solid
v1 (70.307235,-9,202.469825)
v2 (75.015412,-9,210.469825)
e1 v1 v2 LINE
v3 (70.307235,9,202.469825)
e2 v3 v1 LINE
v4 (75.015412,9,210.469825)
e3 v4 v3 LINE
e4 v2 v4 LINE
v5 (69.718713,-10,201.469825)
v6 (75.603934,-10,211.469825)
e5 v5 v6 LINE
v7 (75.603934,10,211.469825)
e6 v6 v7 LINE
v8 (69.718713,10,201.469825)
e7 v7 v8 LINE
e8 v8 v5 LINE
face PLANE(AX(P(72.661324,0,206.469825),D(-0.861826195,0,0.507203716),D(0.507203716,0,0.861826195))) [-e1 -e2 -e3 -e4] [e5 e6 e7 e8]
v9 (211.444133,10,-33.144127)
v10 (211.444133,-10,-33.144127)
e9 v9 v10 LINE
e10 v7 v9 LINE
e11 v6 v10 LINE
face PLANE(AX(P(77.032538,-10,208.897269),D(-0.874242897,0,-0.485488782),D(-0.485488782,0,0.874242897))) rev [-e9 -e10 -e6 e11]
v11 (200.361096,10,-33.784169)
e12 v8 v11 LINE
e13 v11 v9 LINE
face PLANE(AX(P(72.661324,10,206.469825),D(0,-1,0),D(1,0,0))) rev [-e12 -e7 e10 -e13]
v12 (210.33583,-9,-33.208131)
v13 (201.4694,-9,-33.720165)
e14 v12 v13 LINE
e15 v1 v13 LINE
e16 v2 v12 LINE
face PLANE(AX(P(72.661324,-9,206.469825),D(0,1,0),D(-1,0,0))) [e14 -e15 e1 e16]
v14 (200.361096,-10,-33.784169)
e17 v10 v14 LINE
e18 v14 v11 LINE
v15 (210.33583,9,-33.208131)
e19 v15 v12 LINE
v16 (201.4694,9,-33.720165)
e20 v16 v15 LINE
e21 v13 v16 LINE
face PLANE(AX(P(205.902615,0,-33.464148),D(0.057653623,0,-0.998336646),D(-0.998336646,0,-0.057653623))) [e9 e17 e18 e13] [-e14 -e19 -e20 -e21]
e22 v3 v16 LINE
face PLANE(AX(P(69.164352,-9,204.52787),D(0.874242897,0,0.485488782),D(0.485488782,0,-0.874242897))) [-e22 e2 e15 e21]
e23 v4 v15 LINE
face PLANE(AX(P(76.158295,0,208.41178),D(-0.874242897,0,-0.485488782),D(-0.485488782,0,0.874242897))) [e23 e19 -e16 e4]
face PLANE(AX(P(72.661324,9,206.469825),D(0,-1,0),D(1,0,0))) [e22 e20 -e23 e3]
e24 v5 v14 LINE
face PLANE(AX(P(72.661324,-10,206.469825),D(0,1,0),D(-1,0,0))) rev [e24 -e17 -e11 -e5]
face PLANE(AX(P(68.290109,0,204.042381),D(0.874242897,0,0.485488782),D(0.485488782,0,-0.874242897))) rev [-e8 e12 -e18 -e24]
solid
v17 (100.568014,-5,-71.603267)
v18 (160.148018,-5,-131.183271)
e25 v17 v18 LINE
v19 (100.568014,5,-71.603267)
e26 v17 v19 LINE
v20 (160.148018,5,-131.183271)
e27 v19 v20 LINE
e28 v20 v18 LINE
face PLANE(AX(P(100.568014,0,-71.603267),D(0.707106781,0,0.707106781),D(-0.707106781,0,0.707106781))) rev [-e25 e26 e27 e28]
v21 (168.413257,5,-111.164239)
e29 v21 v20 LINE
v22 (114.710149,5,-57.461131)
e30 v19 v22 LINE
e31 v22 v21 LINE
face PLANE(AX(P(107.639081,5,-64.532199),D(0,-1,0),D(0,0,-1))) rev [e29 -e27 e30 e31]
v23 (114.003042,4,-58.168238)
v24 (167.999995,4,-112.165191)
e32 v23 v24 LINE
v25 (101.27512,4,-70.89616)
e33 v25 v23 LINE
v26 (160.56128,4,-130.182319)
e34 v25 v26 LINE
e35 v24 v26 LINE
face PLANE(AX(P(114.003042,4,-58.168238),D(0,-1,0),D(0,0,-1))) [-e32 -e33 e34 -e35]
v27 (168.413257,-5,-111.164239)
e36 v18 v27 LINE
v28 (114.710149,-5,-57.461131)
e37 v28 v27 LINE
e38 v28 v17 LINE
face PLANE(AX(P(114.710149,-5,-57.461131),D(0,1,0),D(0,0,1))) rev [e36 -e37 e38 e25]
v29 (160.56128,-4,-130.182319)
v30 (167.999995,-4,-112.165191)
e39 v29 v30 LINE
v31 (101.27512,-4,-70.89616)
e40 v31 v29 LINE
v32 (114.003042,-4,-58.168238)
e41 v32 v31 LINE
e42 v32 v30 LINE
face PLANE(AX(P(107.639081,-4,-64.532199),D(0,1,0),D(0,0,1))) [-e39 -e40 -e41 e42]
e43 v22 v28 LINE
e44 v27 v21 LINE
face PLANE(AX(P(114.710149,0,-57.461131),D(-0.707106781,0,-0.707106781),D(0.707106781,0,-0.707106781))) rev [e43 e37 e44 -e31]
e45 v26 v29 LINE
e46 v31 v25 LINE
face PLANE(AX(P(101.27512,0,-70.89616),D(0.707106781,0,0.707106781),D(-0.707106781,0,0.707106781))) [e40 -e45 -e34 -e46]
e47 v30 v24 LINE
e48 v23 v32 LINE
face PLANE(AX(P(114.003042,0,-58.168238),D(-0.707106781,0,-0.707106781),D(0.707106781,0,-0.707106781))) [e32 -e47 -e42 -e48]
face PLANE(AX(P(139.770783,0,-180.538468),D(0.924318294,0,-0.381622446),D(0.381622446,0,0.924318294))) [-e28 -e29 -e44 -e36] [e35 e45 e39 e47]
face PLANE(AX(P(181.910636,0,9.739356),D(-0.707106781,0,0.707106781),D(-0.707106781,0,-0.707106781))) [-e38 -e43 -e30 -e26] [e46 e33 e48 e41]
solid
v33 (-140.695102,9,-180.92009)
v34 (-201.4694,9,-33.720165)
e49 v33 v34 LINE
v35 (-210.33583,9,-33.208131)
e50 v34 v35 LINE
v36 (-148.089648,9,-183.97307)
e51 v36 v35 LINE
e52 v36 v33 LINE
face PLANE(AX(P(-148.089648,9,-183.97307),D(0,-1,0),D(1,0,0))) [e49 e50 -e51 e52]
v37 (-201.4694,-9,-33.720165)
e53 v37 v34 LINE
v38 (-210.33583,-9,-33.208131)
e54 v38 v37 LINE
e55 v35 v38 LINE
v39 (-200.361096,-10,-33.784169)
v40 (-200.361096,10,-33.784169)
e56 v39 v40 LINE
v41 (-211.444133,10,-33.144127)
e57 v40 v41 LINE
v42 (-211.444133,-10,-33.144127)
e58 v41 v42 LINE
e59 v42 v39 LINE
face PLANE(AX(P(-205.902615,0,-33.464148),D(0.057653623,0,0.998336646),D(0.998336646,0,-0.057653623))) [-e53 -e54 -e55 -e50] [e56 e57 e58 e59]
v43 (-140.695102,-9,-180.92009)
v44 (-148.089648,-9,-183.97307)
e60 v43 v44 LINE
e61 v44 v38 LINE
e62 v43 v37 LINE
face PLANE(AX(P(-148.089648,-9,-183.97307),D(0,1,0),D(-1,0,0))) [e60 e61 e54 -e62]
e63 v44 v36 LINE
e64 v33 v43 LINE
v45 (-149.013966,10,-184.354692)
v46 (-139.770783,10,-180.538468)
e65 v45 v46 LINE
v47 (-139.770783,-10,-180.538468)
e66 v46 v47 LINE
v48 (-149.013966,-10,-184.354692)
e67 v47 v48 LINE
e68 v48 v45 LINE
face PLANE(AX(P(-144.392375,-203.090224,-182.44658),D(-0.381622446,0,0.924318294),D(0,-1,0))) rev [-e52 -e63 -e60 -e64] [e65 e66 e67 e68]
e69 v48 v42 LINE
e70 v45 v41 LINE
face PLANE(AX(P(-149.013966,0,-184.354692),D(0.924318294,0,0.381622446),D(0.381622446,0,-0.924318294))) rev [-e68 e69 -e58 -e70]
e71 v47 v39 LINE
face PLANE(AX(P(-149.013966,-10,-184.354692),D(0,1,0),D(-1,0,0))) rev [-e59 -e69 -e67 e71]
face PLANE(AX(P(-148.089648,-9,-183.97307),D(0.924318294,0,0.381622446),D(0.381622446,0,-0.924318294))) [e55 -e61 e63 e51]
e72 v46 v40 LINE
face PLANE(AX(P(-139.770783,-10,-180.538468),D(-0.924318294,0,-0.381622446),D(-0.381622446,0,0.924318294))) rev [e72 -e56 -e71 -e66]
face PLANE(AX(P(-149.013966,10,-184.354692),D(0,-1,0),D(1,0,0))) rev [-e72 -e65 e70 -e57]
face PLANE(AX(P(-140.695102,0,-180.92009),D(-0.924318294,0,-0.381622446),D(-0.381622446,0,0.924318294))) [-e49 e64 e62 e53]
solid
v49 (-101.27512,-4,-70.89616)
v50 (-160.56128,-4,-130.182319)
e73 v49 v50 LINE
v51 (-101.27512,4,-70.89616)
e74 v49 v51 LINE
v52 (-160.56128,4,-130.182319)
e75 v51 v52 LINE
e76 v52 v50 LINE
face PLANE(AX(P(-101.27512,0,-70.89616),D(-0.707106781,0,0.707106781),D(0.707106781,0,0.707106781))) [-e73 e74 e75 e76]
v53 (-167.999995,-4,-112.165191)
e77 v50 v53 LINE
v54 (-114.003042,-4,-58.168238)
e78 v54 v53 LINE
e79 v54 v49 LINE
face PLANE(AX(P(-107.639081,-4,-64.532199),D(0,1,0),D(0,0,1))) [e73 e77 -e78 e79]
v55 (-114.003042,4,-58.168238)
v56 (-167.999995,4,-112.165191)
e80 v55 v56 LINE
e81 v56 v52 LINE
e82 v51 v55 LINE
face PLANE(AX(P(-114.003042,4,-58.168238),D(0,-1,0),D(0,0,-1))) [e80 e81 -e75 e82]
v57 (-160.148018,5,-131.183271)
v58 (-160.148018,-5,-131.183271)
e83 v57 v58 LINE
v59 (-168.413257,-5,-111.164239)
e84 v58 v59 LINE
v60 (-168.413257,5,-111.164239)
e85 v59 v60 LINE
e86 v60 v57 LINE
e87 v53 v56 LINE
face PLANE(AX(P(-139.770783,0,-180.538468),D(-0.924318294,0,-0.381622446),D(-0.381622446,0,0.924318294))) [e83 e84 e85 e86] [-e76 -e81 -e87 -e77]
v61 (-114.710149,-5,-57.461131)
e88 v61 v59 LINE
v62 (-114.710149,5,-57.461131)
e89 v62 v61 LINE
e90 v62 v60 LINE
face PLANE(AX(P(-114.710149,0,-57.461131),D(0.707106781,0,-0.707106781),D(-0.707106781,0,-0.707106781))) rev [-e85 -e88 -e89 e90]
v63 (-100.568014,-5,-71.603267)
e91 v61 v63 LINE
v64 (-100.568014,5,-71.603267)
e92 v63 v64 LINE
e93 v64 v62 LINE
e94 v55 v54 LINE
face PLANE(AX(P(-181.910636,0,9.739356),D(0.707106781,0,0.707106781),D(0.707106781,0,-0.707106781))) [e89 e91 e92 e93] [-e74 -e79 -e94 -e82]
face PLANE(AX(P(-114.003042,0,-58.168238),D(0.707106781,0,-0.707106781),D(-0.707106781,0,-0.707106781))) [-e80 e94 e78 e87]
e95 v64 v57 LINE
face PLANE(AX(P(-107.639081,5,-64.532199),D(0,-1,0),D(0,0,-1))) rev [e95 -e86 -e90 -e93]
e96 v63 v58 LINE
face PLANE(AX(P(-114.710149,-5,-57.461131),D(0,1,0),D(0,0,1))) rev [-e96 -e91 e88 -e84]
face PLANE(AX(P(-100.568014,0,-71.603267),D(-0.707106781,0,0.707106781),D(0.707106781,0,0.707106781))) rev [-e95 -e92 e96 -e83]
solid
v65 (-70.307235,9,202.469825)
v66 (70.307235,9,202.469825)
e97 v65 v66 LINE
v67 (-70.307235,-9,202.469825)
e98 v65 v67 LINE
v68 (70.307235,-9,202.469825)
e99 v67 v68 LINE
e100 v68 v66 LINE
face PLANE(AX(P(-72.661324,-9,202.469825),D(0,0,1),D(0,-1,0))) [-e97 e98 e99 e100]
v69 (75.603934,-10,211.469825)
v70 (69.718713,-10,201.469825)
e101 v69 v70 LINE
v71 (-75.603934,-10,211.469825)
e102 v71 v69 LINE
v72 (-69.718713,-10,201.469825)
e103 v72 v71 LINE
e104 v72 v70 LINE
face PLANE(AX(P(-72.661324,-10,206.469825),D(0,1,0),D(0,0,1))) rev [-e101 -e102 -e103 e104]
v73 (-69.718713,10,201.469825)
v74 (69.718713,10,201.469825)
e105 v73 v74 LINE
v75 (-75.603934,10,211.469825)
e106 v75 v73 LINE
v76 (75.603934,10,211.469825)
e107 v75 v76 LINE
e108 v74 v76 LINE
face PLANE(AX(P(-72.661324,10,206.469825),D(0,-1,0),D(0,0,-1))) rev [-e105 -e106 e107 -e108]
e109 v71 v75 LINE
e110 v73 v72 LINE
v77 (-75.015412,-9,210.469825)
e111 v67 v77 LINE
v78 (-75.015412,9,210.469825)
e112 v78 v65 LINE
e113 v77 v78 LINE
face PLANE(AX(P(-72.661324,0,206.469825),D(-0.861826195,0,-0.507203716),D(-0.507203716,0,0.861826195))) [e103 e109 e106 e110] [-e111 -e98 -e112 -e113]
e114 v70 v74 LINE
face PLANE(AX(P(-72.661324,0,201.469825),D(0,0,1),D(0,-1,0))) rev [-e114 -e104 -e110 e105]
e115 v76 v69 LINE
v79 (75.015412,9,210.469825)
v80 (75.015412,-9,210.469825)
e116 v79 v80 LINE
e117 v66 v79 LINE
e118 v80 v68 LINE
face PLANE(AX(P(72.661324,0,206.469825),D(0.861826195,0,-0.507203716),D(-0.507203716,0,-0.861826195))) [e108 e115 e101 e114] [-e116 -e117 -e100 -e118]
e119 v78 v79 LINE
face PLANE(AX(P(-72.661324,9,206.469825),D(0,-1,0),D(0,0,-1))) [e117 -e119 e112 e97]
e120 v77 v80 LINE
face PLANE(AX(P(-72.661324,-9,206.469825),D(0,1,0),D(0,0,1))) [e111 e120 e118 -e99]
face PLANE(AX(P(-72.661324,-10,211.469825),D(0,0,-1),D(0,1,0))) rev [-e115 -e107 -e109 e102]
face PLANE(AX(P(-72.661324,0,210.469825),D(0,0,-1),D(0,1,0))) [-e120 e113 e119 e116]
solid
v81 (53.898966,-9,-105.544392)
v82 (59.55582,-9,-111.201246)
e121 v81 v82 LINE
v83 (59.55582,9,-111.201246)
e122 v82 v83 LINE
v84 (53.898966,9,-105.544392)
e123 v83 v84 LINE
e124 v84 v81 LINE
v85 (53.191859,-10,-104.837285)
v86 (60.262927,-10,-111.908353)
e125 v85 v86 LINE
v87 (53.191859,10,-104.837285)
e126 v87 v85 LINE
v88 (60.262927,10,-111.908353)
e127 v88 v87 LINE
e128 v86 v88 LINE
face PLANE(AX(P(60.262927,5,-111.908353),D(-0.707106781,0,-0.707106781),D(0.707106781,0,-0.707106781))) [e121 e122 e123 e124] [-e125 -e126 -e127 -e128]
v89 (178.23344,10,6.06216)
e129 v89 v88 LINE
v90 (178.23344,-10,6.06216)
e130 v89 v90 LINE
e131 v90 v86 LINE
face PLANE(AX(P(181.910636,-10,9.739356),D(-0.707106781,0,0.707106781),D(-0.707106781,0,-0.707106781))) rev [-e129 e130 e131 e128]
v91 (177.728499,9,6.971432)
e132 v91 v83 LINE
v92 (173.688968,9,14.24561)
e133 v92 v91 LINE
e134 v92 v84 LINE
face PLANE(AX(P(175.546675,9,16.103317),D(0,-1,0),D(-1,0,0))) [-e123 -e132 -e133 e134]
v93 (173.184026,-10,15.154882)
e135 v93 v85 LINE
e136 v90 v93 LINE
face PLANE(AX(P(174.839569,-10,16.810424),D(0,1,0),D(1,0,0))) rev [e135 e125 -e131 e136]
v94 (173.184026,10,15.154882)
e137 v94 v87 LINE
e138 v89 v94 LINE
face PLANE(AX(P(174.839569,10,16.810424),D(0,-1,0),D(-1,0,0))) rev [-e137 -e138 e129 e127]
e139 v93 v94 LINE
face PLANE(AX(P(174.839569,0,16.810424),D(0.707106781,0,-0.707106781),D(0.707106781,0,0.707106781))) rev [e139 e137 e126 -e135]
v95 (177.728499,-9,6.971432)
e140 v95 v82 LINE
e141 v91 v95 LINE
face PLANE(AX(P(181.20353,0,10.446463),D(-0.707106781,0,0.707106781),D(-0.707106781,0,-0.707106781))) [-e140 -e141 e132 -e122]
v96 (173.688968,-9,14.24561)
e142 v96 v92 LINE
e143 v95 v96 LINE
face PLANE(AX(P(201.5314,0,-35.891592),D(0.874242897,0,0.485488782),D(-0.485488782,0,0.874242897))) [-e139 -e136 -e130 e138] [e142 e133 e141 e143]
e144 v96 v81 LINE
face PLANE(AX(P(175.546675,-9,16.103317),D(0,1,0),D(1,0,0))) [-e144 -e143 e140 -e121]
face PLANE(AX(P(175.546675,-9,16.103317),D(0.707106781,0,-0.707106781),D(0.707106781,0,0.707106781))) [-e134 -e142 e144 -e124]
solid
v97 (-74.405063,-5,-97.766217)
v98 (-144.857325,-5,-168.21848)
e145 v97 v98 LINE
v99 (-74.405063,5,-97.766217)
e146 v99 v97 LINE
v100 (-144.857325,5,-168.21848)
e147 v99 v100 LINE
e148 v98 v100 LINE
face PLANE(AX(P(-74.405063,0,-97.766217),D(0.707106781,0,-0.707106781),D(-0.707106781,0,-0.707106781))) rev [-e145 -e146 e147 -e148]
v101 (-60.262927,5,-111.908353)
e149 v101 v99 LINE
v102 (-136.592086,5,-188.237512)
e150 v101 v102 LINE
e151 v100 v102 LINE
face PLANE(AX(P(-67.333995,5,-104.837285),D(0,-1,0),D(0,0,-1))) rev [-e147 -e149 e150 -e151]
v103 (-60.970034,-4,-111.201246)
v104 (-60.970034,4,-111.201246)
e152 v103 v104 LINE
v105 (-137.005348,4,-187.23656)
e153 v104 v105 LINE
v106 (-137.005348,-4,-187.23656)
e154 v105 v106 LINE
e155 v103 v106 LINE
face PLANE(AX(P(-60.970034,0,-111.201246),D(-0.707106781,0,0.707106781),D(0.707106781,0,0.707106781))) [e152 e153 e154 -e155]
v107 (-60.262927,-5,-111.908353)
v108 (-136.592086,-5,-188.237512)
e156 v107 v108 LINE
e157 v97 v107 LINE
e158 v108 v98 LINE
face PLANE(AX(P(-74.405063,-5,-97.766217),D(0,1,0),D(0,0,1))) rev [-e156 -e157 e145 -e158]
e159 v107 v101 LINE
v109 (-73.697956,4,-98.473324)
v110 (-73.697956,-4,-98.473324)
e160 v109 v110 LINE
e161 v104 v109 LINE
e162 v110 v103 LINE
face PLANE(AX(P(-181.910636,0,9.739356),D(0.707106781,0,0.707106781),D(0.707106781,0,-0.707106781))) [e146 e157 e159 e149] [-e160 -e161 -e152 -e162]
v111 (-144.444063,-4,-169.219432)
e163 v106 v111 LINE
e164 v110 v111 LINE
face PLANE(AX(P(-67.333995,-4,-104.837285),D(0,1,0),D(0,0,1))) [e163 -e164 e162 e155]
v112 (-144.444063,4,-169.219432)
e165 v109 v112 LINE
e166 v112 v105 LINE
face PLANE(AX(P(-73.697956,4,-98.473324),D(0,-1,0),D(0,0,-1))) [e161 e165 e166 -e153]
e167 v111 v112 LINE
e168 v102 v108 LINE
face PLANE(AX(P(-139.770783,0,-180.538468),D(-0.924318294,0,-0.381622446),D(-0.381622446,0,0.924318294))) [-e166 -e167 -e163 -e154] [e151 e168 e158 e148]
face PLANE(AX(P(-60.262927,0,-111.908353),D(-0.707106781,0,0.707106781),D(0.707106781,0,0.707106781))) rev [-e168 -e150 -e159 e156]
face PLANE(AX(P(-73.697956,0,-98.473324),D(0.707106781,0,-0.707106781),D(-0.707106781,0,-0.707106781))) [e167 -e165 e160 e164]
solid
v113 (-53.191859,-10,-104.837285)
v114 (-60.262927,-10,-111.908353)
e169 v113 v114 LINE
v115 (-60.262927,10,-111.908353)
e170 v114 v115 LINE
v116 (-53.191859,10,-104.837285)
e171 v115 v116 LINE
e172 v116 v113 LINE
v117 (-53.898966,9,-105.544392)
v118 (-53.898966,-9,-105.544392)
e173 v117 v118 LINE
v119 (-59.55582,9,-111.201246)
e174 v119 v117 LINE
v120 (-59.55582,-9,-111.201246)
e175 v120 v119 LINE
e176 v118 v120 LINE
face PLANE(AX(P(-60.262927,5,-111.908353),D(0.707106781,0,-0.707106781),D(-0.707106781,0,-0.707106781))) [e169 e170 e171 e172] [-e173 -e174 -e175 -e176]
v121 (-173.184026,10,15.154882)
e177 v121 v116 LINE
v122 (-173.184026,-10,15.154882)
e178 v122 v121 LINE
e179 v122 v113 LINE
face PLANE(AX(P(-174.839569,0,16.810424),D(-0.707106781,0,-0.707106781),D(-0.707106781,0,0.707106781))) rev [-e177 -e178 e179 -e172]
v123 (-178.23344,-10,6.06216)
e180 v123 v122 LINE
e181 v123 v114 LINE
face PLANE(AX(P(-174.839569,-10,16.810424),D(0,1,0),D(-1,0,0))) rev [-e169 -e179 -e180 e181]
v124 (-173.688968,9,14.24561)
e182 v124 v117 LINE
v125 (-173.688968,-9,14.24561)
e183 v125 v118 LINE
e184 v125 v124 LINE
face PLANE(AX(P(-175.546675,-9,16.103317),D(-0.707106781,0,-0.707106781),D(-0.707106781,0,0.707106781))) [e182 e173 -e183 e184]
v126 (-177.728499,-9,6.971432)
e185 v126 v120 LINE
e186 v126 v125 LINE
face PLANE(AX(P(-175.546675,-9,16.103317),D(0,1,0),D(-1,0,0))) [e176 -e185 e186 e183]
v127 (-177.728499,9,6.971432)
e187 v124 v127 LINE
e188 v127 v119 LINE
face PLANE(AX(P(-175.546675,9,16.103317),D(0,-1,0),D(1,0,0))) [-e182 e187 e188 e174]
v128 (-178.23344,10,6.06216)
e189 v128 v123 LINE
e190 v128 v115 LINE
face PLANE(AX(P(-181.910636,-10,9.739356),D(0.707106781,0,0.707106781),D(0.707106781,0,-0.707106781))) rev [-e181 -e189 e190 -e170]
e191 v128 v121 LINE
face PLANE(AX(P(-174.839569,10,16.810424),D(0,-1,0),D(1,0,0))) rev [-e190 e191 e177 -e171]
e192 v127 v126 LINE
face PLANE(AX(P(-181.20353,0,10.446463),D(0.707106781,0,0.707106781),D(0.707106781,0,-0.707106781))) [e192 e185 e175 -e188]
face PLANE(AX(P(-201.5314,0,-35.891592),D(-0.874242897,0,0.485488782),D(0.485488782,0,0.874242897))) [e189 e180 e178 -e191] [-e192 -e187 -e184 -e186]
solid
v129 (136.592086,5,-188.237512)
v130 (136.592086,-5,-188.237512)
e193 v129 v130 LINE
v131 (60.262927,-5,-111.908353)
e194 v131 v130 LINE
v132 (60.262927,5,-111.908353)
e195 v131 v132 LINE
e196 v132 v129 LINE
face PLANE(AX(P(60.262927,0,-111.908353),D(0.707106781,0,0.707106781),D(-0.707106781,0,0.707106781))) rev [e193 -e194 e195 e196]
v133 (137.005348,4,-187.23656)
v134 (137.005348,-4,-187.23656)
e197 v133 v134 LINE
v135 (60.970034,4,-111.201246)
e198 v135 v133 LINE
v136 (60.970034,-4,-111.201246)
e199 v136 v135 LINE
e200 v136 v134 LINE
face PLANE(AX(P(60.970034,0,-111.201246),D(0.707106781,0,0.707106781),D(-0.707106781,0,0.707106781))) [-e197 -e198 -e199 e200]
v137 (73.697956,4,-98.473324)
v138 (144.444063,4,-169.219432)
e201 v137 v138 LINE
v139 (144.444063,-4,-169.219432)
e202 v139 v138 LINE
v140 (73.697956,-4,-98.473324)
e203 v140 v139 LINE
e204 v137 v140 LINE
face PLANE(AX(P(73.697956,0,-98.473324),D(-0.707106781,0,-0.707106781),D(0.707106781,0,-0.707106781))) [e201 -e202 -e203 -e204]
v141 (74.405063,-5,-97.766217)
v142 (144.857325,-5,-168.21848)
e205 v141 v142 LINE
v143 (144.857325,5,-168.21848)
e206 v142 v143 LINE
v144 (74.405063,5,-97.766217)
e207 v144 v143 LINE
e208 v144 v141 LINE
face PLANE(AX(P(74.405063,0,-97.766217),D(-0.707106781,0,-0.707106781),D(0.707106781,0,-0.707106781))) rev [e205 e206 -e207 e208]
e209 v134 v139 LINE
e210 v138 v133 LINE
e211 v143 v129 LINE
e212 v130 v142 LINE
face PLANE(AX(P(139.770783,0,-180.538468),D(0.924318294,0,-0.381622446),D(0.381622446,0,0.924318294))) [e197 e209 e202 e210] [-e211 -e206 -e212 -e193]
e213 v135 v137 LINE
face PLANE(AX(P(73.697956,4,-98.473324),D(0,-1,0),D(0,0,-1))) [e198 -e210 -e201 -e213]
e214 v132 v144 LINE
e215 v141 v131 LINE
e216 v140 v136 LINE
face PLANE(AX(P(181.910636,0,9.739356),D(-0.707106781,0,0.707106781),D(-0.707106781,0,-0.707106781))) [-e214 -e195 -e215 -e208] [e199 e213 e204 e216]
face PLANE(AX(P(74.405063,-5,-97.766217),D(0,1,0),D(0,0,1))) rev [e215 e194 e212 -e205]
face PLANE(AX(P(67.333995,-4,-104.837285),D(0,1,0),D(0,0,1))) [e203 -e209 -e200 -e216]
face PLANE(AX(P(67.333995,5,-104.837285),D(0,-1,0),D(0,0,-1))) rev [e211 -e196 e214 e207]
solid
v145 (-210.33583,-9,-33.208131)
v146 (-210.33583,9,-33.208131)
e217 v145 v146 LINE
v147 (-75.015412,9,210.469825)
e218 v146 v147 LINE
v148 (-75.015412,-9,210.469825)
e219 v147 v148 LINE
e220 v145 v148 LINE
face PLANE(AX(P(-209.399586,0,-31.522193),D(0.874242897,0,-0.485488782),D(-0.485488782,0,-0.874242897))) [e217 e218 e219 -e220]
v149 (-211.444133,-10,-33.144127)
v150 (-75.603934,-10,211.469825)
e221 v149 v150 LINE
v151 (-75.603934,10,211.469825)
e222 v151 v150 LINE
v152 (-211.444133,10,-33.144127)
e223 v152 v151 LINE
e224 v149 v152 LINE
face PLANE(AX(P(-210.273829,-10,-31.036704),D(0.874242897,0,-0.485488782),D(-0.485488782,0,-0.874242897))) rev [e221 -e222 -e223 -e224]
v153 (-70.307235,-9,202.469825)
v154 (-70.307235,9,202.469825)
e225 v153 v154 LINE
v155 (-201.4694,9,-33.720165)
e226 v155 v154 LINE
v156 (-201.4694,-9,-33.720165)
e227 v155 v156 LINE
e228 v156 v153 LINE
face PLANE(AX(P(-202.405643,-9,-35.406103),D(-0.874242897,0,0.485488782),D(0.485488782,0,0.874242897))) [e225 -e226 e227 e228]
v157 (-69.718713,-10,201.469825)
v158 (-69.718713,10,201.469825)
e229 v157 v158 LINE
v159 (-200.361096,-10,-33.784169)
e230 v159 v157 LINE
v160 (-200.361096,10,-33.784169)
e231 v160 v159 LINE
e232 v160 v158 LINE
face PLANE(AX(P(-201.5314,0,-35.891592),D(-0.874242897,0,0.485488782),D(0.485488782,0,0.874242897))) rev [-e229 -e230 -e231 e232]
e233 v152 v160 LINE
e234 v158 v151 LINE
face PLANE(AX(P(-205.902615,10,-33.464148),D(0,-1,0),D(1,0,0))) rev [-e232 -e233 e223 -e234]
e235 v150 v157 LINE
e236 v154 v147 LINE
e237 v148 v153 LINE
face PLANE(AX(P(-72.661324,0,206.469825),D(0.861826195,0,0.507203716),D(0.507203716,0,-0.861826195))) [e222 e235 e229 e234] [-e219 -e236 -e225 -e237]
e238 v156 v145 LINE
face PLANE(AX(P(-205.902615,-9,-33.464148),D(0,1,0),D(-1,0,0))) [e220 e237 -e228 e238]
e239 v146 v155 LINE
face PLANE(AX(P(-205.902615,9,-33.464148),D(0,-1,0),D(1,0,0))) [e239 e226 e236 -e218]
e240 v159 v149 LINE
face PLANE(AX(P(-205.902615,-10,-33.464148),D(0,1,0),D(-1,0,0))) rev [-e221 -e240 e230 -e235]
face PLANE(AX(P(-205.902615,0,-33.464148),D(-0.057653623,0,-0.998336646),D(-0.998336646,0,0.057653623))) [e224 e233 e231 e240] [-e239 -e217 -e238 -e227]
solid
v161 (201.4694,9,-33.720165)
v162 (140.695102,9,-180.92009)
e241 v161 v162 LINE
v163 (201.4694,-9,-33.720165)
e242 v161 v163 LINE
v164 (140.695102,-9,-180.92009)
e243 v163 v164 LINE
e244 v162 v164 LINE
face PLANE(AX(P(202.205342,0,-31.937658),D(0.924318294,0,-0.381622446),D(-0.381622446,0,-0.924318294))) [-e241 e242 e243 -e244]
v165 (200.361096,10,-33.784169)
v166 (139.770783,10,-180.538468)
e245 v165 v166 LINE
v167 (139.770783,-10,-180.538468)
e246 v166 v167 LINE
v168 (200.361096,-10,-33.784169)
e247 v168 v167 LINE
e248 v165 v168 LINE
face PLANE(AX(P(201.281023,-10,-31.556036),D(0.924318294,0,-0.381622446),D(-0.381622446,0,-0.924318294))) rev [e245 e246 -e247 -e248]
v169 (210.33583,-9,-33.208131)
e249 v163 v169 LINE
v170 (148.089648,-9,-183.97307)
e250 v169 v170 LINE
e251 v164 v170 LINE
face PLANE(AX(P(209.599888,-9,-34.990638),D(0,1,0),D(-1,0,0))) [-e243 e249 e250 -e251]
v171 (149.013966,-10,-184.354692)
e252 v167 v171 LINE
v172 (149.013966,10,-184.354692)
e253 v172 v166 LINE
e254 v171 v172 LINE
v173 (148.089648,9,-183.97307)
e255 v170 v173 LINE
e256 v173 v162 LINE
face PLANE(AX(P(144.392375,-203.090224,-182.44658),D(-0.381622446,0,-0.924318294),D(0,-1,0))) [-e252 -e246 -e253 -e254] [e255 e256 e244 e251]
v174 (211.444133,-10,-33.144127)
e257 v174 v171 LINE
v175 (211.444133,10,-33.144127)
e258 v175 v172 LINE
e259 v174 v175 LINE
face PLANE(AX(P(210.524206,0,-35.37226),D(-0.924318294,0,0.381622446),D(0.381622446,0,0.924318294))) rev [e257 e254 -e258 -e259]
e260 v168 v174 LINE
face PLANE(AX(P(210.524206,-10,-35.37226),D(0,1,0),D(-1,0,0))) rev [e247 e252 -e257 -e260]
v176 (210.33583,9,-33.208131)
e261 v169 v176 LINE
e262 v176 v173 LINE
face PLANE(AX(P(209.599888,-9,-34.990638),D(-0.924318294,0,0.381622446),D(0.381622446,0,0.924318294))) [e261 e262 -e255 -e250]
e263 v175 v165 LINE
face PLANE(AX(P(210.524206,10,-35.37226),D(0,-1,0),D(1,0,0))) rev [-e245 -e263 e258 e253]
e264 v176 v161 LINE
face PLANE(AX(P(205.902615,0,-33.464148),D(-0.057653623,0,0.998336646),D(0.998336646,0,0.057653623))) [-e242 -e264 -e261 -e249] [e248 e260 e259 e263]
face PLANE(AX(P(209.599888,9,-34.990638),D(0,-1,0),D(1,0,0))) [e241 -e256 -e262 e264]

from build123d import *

# Parameters (mm, degrees)
MEMBER_START      = -10
MEMBER_1_DEPTH    = 20
MEMBER_1_2_DEPTH  = 1
MEMBER_START_2    = 9
MEMBER_1_3_DEPTH  = 1
MEMBER_1_4_DEPTH  = 20
MEMBER_1_5_DEPTH  = 1
MEMBER_1_6_DEPTH  = 1
MEMBER_1_7_DEPTH  = 20
MEMBER_1_8_DEPTH  = 1
MEMBER_1_9_DEPTH  = 1
MEMBER_1_10_DEPTH = 20
MEMBER_1_11_DEPTH = 1
MEMBER_1_12_DEPTH = 1
MEMBER_1_13_DEPTH = 20
MEMBER_1_14_DEPTH = 1
MEMBER_1_15_DEPTH = 1
MEMBER_1_16_DEPTH = 20
MEMBER_1_17_DEPTH = 1
MEMBER_1_18_DEPTH = 1
MEMBER_START_3    = -5
MEMBER_1_19_DEPTH = 1
MEMBER_START_4    = 4
MEMBER_1_20_DEPTH = 1
MEMBER_START_5    = -4
MEMBER_1_21_DEPTH = 8
MEMBER_1_22_DEPTH = 1
MEMBER_1_23_DEPTH = 1
MEMBER_1_24_DEPTH = 8


# Read off the part's stored shape, not the designer's step: 结构构件1
with BuildPart() as part:
    # Member 1 outline → Member 1 (new body)
    with BuildSketch(Plane(origin=(0, 0, 0), x_dir=(1, 0, 0), z_dir=(0, 1, 0)).offset(MEMBER_START)):
        Polygon((211.444133454, 33.144126958), (149.013966185, 184.354692044), (148.089647891, 183.973069598), (210.3358297, 33.208131146), align=None)
        Polygon((201.469399669, 33.720164656), (140.695101539, 180.92009003), (139.770783245, 180.538467584), (200.361095915, 33.784168845), align=None)
    extrude(amount=MEMBER_1_DEPTH)

    # Member 1 2 outline → Member 1 2 (add)
    with BuildSketch(Plane(origin=(0, 0, 0), x_dir=(1, 0, 0), z_dir=(0, 1, 0)).offset(MEMBER_START)):
        Polygon((210.3358297, 33.208131146), (148.089647891, 183.973069598), (140.695101539, 180.92009003), (201.469399669, 33.720164656), align=None)
    extrude(amount=MEMBER_1_2_DEPTH)

    # Member 1 3 outline → Member 1 3 (add)
    with BuildSketch(Plane(origin=(0, 0, 0), x_dir=(1, 0, 0), z_dir=(0, 1, 0)).offset(MEMBER_START_2)):
        Polygon((210.3358297, 33.208131146), (148.089647891, 183.973069598), (140.695101539, 180.92009003), (201.469399669, 33.720164656), align=None)
    extrude(amount=MEMBER_1_3_DEPTH)


with BuildPart() as body_2:
    # Member 1 4 outline → Member 1 4 (new body)
    with BuildSketch(Plane(origin=(0, 0, 0), x_dir=(1, 0, 0), z_dir=(0, 1, 0)).offset(MEMBER_START)):
        Polygon((200.361095915, 33.784168845), (69.718713444, -201.469825071), (70.30723549, -202.469825071), (201.469399669, 33.720164656), align=None)
        Polygon((210.3358297, 33.208131146), (75.015411857, -210.469825071), (75.603933902, -211.469825071), (211.444133454, 33.144126958), align=None)
    extrude(amount=MEMBER_1_4_DEPTH)

    # Member 1 5 outline → Member 1 5 (add)
    with BuildSketch(Plane(origin=(0, 0, 0), x_dir=(1, 0, 0), z_dir=(0, 1, 0)).offset(MEMBER_START)):
        Polygon((201.469399669, 33.720164656), (70.30723549, -202.469825071), (75.015411856, -210.469825071), (210.3358297, 33.208131146), align=None)
    extrude(amount=MEMBER_1_5_DEPTH)

    # Member 1 6 outline → Member 1 6 (add)
    with BuildSketch(Plane(origin=(0, 0, 0), x_dir=(1, 0, 0), z_dir=(0, 1, 0)).offset(MEMBER_START_2)):
        Polygon((201.469399669, 33.720164656), (70.30723549, -202.469825071), (75.015411856, -210.469825071), (210.3358297, 33.208131146), align=None)
    extrude(amount=MEMBER_1_6_DEPTH)


with BuildPart() as body_3:
    # Member 1 7 outline → Member 1 7 (new body)
    with BuildSketch(Plane(origin=(0, 0, 0), x_dir=(1, 0, 0), z_dir=(0, 1, 0)).offset(MEMBER_START)):
        Polygon((69.718713444, -201.469825071), (-69.718713444, -201.469825071), (-70.30723549, -202.469825071), (70.30723549, -202.469825071), align=None)
        Polygon((75.015411857, -210.469825071), (-75.015411857, -210.469825071), (-75.603933902, -211.469825071), (75.603933902, -211.469825071), align=None)
    extrude(amount=MEMBER_1_7_DEPTH)

    # Member 1 8 outline → Member 1 8 (add)
    with BuildSketch(Plane(origin=(0, 0, 0), x_dir=(1, 0, 0), z_dir=(0, 1, 0)).offset(MEMBER_START)):
        Polygon((70.30723549, -202.469825071), (-70.30723549, -202.469825071), (-75.015411856, -210.469825071), (75.015411857, -210.469825071), align=None)
    extrude(amount=MEMBER_1_8_DEPTH)

    # Member 1 9 outline → Member 1 9 (add)
    with BuildSketch(Plane(origin=(0, 0, 0), x_dir=(1, 0, 0), z_dir=(0, 1, 0)).offset(MEMBER_START_2)):
        Polygon((70.30723549, -202.469825071), (-70.30723549, -202.469825071), (-75.015411856, -210.469825071), (75.015411857, -210.469825071), align=None)
    extrude(amount=MEMBER_1_9_DEPTH)


with BuildPart() as body_4:
    # Member 1 10 outline → Member 1 10 (new body)
    with BuildSketch(Plane(origin=(0, 0, 0), x_dir=(1, 0, 0), z_dir=(0, 1, 0)).offset(MEMBER_START)):
        Polygon((-69.718713444, -201.469825071), (-200.361095915, 33.784168845), (-201.469399669, 33.720164656), (-70.30723549, -202.469825071), align=None)
        Polygon((-75.015411857, -210.469825071), (-210.3358297, 33.208131146), (-211.444133454, 33.144126958), (-75.603933902, -211.469825071), align=None)
    extrude(amount=MEMBER_1_10_DEPTH)

    # Member 1 11 outline → Member 1 11 (add)
    with BuildSketch(Plane(origin=(0, 0, 0), x_dir=(1, 0, 0), z_dir=(0, 1, 0)).offset(MEMBER_START)):
        Polygon((-70.30723549, -202.469825071), (-201.469399669, 33.720164656), (-210.3358297, 33.208131147), (-75.015411857, -210.469825071), align=None)
    extrude(amount=MEMBER_1_11_DEPTH)

    # Member 1 12 outline → Member 1 12 (add)
    with BuildSketch(Plane(origin=(0, 0, 0), x_dir=(1, 0, 0), z_dir=(0, 1, 0)).offset(MEMBER_START_2)):
        Polygon((-70.30723549, -202.469825071), (-201.469399669, 33.720164656), (-210.3358297, 33.208131147), (-75.015411857, -210.469825071), align=None)
    extrude(amount=MEMBER_1_12_DEPTH)


with BuildPart() as body_5:
    # Member 1 13 outline → Member 1 13 (new body)
    with BuildSketch(Plane(origin=(0, 0, 0), x_dir=(1, 0, 0), z_dir=(0, 1, 0)).offset(MEMBER_START)):
        Polygon((-149.013966185, 184.354692044), (-211.444133454, 33.144126958), (-210.3358297, 33.208131147), (-148.089647891, 183.973069598), align=None)
        Polygon((-140.695101539, 180.92009003), (-201.469399669, 33.720164656), (-200.361095915, 33.784168845), (-139.770783245, 180.538467584), align=None)
    extrude(amount=MEMBER_1_13_DEPTH)

    # Member 1 14 outline → Member 1 14 (add)
    with BuildSketch(Plane(origin=(0, 0, 0), x_dir=(1, 0, 0), z_dir=(0, 1, 0)).offset(MEMBER_START)):
        Polygon((-148.089647891, 183.973069598), (-210.3358297, 33.208131146), (-201.469399669, 33.720164656), (-140.695101539, 180.92009003), align=None)
    extrude(amount=MEMBER_1_14_DEPTH)

    # Member 1 15 outline → Member 1 15 (add)
    with BuildSketch(Plane(origin=(0, 0, 0), x_dir=(1, 0, 0), z_dir=(0, 1, 0)).offset(MEMBER_START_2)):
        Polygon((-148.089647891, 183.973069598), (-210.3358297, 33.208131146), (-201.469399669, 33.720164656), (-140.695101539, 180.92009003), align=None)
    extrude(amount=MEMBER_1_15_DEPTH)


with BuildPart() as body_6:
    # Member 1 16 outline → Member 1 16 (new body)
    with BuildSketch(Plane(origin=(0, 0, 0), x_dir=(1, 0, 0), z_dir=(0, 1, 0)).offset(MEMBER_START)):
        Polygon((-173.184026314, -15.154881759), (-53.191859315, 104.83728524), (-53.898966096, 105.544392022), (-173.688967715, -14.245609598), align=None)
        Polygon((-177.728498928, -6.971432311), (-59.555820345, 111.201246271), (-60.262927127, 111.908353052), (-178.233440329, -6.06216015), align=None)
    extrude(amount=MEMBER_1_16_DEPTH)

    # Member 1 17 outline → Member 1 17 (add)
    with BuildSketch(Plane(origin=(0, 0, 0), x_dir=(1, 0, 0), z_dir=(0, 1, 0)).offset(MEMBER_START)):
        Polygon((-173.688967715, -14.245609598), (-53.898966096, 105.544392022), (-59.555820346, 111.20124627), (-177.728498928, -6.971432311), align=None)
    extrude(amount=MEMBER_1_17_DEPTH)

    # Member 1 18 outline → Member 1 18 (add)
    with BuildSketch(Plane(origin=(0, 0, 0), x_dir=(1, 0, 0), z_dir=(0, 1, 0)).offset(MEMBER_START_2)):
        Polygon((-173.688967715, -14.245609598), (-53.898966096, 105.544392022), (-59.555820346, 111.20124627), (-177.728498928, -6.971432311), align=None)
    extrude(amount=MEMBER_1_18_DEPTH)


with BuildPart() as body_7:
    # Member 1 19 outline → Member 1 19 (new body)
    with BuildSketch(Plane(origin=(0, 0, 0), x_dir=(1, 0, 0), z_dir=(0, 1, 0)).offset(MEMBER_START_3)):
        Polygon((-74.40506275, 97.766217429), (-60.262927127, 111.908353052), (-136.592085909, 188.237511835), (-144.857325246, 168.218479924), align=None)
    extrude(amount=MEMBER_1_19_DEPTH)

    # Member 1 20 outline → Member 1 20 (add)
    with BuildSketch(Plane(origin=(0, 0, 0), x_dir=(1, 0, 0), z_dir=(0, 1, 0)).offset(MEMBER_START_4)):
        Polygon((-74.40506275, 97.766217429), (-60.262927127, 111.908353052), (-136.592085909, 188.237511835), (-144.857325246, 168.218479924), align=None)
    extrude(amount=MEMBER_1_20_DEPTH)

    # Member 1 21 outline → Member 1 21 (add)
    with BuildSketch(Plane(origin=(0, 0, 0), x_dir=(1, 0, 0), z_dir=(0, 1, 0)).offset(MEMBER_START_5)):
        Polygon((-74.40506275, 97.766217429), (-73.697955969, 98.47332421), (-144.444063279, 169.21943152), (-144.857325246, 168.218479924), align=None)
        Polygon((-137.005347876, 187.236560239), (-60.970033908, 111.201246271), (-60.262927127, 111.908353052), (-136.592085909, 188.237511835), align=None)
    extrude(amount=MEMBER_1_21_DEPTH)


with BuildPart() as body_8:
    # Member 1 22 outline → Member 1 22 (new body)
    with BuildSketch(Plane(origin=(0, 0, 0), x_dir=(1, 0, 0), z_dir=(0, 1, 0)).offset(MEMBER_START_3)):
        Polygon((-114.710149278, 57.461130901), (-100.568013654, 71.603266525), (-160.148018019, 131.18327089), (-168.413257356, 111.164238979), align=None)
    extrude(amount=MEMBER_1_22_DEPTH)

    # Member 1 23 outline → Member 1 23 (add)
    with BuildSketch(Plane(origin=(0, 0, 0), x_dir=(1, 0, 0), z_dir=(0, 1, 0)).offset(MEMBER_START_4)):
        Polygon((-114.710149278, 57.461130901), (-100.568013654, 71.603266525), (-160.148018019, 131.18327089), (-168.413257356, 111.164238979), align=None)
    extrude(amount=MEMBER_1_23_DEPTH)

    # Member 1 24 outline → Member 1 24 (add)
    with BuildSketch(Plane(origin=(0, 0, 0), x_dir=(1, 0, 0), z_dir=(0, 1, 0)).offset(MEMBER_START_5)):
        Polygon((-114.710149278, 57.461130901), (-114.003042497, 58.168237682), (-167.99999539, 112.165190575), (-168.413257356, 111.164238979), align=None)
        Polygon((-160.561279986, 130.182319294), (-101.275120435, 70.896159743), (-100.568013654, 71.603266525), (-160.148018019, 131.18327089), align=None)
    extrude(amount=MEMBER_1_24_DEPTH)


with BuildPart() as body_9:
    # 镜向1: mirrored copy
    add(body_7.part.mirror(Plane(origin=(0, 0, 0), x_dir=(0, 0, 1), z_dir=(1, 0, 0))))


with BuildPart() as body_10:
    # Mirror 1 2: mirrored copy
    add(body_8.part.mirror(Plane(origin=(0, 0, 0), x_dir=(0, 0, 1), z_dir=(1, 0, 0))))


with BuildPart() as body_11:
    # Mirror 1 3: mirrored copy
    add(body_6.part.mirror(Plane(origin=(0, 0, 0), x_dir=(0, 0, 1), z_dir=(1, 0, 0))))


solid = Compound([part.part, body_2.part, body_3.part, body_4.part, body_5.part, body_6.part, body_7.part, body_8.part, body_9.part, body_10.part, body_11.part])
